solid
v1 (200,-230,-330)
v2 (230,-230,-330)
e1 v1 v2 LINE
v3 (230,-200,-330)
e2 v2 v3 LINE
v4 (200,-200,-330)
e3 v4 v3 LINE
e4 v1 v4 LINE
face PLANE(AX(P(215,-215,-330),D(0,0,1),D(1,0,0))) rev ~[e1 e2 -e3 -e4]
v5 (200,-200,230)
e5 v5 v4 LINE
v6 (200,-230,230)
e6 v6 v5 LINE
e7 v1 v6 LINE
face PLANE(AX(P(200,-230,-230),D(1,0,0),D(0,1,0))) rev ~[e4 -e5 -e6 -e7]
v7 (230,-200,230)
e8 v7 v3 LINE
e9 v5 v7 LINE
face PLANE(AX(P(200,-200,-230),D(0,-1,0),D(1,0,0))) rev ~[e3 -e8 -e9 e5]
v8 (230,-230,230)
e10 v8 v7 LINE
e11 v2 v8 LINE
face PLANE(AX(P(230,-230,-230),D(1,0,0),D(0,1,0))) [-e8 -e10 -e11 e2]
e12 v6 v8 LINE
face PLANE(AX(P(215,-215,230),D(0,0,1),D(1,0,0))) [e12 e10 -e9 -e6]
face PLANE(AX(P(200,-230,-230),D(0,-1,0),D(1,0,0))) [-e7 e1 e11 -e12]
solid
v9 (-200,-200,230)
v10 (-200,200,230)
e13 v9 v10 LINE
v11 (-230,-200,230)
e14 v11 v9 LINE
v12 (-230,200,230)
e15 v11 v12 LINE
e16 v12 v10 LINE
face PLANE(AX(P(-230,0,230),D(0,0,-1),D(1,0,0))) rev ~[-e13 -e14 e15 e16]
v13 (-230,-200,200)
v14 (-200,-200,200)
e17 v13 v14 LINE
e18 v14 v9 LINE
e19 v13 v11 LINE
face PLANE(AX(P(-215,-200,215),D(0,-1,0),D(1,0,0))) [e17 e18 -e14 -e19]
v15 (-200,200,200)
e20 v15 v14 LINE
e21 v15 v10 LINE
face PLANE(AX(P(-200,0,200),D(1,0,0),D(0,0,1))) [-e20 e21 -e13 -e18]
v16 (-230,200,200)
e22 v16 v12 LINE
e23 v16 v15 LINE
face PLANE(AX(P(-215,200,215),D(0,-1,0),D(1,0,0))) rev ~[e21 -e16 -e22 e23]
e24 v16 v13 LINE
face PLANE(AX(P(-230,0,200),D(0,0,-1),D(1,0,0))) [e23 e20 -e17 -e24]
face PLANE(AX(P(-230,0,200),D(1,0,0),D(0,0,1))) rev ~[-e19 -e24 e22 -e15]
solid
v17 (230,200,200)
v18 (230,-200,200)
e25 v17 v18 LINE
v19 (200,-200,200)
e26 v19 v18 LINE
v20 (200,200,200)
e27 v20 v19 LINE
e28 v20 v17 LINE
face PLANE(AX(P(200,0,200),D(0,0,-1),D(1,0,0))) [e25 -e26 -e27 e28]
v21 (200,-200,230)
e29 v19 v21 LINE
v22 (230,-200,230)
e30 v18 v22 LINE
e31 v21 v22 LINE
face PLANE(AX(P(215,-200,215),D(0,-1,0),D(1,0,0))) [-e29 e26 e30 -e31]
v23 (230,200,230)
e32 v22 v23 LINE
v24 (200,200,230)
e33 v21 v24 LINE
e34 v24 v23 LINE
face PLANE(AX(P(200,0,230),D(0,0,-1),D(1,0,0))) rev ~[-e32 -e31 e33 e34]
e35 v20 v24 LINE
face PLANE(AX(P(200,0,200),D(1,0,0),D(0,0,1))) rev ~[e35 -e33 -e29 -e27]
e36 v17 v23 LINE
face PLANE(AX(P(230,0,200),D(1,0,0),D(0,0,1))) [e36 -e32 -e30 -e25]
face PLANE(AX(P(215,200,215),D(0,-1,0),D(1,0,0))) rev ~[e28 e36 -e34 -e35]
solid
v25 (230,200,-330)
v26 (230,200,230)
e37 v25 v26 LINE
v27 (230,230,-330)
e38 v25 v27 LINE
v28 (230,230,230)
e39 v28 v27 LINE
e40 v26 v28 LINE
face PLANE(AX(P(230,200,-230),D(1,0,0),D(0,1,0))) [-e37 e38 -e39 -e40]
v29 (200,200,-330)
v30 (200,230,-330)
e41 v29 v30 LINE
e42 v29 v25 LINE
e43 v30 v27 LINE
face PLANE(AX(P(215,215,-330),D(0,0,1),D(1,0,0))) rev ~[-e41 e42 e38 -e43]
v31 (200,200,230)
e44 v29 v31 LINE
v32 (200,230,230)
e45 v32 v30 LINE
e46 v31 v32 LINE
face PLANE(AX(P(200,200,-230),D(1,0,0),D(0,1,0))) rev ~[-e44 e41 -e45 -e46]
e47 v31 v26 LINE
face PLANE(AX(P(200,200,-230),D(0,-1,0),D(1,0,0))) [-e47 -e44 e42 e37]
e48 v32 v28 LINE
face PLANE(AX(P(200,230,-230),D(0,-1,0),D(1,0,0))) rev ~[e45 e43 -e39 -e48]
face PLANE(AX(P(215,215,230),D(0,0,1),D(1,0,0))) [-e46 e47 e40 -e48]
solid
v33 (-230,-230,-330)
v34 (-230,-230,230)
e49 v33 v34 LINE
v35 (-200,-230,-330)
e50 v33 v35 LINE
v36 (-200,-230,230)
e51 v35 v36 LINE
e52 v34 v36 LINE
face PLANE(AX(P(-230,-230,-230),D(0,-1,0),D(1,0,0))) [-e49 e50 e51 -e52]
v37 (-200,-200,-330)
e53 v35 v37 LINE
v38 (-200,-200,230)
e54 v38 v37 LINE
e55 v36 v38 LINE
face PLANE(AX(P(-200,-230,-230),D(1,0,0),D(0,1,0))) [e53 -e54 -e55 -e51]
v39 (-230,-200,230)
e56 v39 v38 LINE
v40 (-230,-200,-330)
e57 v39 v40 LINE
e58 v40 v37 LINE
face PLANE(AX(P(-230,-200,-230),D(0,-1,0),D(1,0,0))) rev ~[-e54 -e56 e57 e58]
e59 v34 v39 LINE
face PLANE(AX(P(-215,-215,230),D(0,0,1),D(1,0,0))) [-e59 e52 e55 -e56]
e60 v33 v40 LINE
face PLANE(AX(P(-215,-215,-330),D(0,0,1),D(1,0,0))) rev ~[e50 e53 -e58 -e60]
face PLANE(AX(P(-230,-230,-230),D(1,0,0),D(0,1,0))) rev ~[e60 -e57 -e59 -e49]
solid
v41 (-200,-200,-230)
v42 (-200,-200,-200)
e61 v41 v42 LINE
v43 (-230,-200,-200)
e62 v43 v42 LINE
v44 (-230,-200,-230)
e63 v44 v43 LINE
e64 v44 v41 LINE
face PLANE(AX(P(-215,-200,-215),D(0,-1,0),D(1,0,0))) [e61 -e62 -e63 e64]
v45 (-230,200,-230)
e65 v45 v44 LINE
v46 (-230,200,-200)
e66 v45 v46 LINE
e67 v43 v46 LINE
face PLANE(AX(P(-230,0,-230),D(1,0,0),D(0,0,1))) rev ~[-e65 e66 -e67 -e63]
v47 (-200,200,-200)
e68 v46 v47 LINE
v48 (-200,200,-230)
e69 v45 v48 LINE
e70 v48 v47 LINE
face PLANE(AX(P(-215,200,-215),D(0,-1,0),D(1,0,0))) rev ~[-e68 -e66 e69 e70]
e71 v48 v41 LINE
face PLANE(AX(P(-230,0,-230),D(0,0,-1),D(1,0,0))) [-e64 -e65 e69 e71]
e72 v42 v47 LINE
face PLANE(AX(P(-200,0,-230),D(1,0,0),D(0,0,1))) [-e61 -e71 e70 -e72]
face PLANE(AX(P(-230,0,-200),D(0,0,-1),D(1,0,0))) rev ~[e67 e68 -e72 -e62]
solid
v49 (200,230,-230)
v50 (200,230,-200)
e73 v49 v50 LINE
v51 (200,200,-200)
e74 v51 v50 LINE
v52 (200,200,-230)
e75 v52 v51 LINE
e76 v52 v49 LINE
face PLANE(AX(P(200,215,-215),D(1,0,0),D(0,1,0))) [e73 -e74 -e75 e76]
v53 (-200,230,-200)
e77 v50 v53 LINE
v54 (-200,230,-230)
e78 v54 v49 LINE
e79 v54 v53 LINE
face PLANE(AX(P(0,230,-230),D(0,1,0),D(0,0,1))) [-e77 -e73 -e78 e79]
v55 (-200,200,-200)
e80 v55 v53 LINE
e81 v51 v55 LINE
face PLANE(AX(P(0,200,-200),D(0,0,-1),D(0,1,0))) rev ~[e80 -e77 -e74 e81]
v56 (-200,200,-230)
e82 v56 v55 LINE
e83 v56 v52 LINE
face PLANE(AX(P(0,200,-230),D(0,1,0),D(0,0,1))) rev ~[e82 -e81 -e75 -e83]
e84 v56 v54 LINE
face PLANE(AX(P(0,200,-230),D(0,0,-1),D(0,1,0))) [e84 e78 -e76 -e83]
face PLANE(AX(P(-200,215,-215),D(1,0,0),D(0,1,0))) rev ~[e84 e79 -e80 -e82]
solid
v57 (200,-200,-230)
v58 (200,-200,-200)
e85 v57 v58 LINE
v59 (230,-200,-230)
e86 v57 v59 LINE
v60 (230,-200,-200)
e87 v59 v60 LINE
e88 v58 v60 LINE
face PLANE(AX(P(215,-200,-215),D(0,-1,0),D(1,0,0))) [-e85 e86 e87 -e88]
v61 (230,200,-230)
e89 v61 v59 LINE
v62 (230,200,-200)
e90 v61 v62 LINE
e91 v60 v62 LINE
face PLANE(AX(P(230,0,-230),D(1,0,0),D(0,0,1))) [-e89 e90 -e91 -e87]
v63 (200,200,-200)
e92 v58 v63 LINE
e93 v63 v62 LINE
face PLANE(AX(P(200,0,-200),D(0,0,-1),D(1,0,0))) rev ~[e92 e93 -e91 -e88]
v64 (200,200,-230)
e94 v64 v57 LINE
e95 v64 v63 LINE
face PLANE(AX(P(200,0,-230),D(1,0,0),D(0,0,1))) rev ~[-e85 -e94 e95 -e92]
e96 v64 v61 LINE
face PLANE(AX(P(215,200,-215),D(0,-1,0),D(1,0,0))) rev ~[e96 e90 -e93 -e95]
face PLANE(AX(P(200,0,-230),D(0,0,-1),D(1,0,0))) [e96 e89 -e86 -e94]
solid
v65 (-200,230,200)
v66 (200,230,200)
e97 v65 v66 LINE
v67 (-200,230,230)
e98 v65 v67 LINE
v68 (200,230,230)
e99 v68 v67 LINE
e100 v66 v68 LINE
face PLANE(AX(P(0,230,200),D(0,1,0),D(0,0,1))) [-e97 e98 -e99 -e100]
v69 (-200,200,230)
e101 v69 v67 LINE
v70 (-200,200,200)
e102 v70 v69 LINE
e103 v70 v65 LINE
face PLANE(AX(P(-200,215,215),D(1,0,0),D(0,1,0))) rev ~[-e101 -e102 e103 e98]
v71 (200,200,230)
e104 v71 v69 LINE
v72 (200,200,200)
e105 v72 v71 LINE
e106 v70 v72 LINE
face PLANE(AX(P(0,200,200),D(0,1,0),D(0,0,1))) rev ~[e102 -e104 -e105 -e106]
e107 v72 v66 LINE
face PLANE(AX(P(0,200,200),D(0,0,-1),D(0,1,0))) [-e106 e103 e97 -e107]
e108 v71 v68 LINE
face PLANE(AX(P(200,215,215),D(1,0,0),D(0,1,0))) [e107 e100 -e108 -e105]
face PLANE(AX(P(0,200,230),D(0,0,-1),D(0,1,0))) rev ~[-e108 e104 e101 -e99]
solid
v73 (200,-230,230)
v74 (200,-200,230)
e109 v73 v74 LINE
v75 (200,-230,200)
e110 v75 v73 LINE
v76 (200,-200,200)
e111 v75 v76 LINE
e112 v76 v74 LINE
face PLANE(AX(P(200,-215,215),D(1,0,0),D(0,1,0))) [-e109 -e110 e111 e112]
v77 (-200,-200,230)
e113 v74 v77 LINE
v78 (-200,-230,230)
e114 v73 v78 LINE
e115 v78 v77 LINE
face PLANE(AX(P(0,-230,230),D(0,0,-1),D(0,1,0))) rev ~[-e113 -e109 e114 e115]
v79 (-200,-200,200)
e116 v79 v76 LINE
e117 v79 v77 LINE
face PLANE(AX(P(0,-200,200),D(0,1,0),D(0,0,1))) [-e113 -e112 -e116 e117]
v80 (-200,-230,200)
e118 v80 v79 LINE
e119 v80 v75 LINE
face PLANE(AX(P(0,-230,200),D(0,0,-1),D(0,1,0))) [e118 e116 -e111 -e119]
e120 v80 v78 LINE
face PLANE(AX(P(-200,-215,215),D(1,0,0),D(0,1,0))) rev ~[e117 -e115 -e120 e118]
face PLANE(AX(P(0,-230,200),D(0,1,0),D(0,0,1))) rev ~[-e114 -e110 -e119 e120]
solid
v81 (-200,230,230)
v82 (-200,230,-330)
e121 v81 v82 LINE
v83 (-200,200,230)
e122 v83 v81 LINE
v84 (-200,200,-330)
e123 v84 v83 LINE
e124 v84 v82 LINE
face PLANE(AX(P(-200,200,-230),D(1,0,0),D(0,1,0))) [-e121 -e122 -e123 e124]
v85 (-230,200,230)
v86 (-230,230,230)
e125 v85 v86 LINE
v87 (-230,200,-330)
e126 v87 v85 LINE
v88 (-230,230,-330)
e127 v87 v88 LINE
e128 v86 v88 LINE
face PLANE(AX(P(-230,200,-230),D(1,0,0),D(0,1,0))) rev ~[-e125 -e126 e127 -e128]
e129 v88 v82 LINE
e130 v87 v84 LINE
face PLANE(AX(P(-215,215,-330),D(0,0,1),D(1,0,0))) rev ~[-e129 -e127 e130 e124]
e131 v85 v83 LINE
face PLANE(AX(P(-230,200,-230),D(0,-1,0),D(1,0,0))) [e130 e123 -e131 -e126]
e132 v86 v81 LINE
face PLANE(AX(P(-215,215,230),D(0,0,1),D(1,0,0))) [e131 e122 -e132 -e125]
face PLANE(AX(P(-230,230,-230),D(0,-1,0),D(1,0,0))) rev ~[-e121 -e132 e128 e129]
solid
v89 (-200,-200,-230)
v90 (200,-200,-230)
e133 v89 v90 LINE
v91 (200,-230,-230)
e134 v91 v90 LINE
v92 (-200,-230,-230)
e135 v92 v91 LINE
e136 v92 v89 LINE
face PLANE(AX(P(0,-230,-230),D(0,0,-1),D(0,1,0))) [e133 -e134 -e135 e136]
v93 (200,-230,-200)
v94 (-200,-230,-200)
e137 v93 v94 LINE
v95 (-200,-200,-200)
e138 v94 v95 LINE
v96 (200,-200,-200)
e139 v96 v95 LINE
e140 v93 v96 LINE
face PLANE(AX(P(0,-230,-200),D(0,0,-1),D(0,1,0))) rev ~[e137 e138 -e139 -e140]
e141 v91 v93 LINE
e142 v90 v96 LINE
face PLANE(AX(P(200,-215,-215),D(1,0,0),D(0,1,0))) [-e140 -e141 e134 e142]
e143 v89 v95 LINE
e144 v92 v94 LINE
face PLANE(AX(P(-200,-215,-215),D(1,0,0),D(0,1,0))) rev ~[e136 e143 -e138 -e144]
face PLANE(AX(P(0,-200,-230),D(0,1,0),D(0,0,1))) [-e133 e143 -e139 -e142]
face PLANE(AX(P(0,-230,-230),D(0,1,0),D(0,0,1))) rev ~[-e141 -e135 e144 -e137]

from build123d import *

# Parameters (mm, degrees)
F3_W     = 30
F3_H     = 30
F4_DEPTH = 230
F5_W     = 30
F5_H     = 30
F6_DEPTH = 200
F7_W     = 30
F7_H     = 30
F8_DEPTH = 200
F9_DEPTH = 100


with BuildPart() as f4:
    # F3 (on Top) → F4 (new body, symmetric)
    with BuildSketch(Plane.XY):
        with Locations((-215, 215)):
            Rectangle(F3_W, F3_H)
    extrude(amount=F4_DEPTH, both=True)

    # F9#3 (add): a face of the model
    f9_3_faces = [f4.faces().sort_by_distance(p)[0] for p in [
        (-215, 215, -230),
    ]]
    extrude(f9_3_faces, amount=F9_DEPTH)


with BuildPart() as f4b:
    # F3 (on Top) → F4, piece 2 (new body, symmetric)
    with BuildSketch(Plane.XY):
        with Locations((215, 215)):
            Rectangle(F3_W, F3_H)
    extrude(amount=F4_DEPTH, both=True)

    # F9#4 (add): a face of the model
    f9_4_faces = [f4b.faces().sort_by_distance(p)[0] for p in [
        (215, 215, -230),
    ]]
    extrude(f9_4_faces, amount=F9_DEPTH)


with BuildPart() as f4c:
    # F3 (on Top) → F4, piece 3 (new body, symmetric)
    with BuildSketch(Plane.XY):
        with Locations((215, -215)):
            Rectangle(F3_W, F3_H)
    extrude(amount=F4_DEPTH, both=True)

    # F9#2 (add): a face of the model
    f9_2_faces = [f4c.faces().sort_by_distance(p)[0] for p in [
        (215, -215, -230),
    ]]
    extrude(f9_2_faces, amount=F9_DEPTH)


with BuildPart() as f4d:
    # F3 (on Top) → F4, piece 4 (new body, symmetric)
    with BuildSketch(Plane.XY):
        with Locations((-215, -215)):
            Rectangle(F3_W, F3_H)
    extrude(amount=F4_DEPTH, both=True)

    # F9 (add): a face of the model
    f9_faces = [f4d.faces().sort_by_distance(p)[0] for p in [
        (-215, -215, -230),
    ]]
    extrude(f9_faces, amount=F9_DEPTH)


with BuildPart() as f6:
    # F5 (on Front) → F6 (new body, symmetric)
    with BuildSketch(Plane.XZ):
        with Locations((-215, 215)):
            Rectangle(F5_W, F5_H)
    extrude(amount=F6_DEPTH, both=True)


with BuildPart() as f6b:
    # F5 (on Front) → F6, piece 2 (new body, symmetric)
    with BuildSketch(Plane.XZ):
        with Locations((215, 215)):
            Rectangle(F5_W, F5_H)
    extrude(amount=F6_DEPTH, both=True)


with BuildPart() as f6c:
    # F5 (on Front) → F6, piece 3 (new body, symmetric)
    with BuildSketch(Plane.XZ):
        with Locations((-215, -215)):
            Rectangle(F5_W, F5_H)
    extrude(amount=F6_DEPTH, both=True)


with BuildPart() as f6d:
    # F5 (on Front) → F6, piece 4 (new body, symmetric)
    with BuildSketch(Plane.XZ):
        with Locations((215, -215)):
            Rectangle(F5_W, F5_H)
    extrude(amount=F6_DEPTH, both=True)


with BuildPart() as f8:
    # F7 (on Right) → F8 (new body, symmetric)
    with BuildSketch(Plane.YZ):
        with Locations((-215, 215)):
            Rectangle(F7_W, F7_H)
    extrude(amount=F8_DEPTH, both=True)


with BuildPart() as f8b:
    # F7 (on Right) → F8, piece 2 (new body, symmetric)
    with BuildSketch(Plane.YZ):
        with Locations((215, 215)):
            Rectangle(F7_W, F7_H)
    extrude(amount=F8_DEPTH, both=True)


with BuildPart() as f8c:
    # F7 (on Right) → F8, piece 3 (new body, symmetric)
    with BuildSketch(Plane.YZ):
        with Locations((215, -215)):
            Rectangle(F7_W, F7_H)
    extrude(amount=F8_DEPTH, both=True)


with BuildPart() as f8d:
    # F7 (on Right) → F8, piece 4 (new body, symmetric)
    with BuildSketch(Plane.YZ):
        with Locations((-215, -215)):
            Rectangle(F7_W, F7_H)
    extrude(amount=F8_DEPTH, both=True)


solid = Compound([f4.part, f4b.part, f4c.part, f4d.part, f6.part, f6b.part, f6c.part, f6d.part, f8.part, f8b.part, f8c.part, f8d.part])
